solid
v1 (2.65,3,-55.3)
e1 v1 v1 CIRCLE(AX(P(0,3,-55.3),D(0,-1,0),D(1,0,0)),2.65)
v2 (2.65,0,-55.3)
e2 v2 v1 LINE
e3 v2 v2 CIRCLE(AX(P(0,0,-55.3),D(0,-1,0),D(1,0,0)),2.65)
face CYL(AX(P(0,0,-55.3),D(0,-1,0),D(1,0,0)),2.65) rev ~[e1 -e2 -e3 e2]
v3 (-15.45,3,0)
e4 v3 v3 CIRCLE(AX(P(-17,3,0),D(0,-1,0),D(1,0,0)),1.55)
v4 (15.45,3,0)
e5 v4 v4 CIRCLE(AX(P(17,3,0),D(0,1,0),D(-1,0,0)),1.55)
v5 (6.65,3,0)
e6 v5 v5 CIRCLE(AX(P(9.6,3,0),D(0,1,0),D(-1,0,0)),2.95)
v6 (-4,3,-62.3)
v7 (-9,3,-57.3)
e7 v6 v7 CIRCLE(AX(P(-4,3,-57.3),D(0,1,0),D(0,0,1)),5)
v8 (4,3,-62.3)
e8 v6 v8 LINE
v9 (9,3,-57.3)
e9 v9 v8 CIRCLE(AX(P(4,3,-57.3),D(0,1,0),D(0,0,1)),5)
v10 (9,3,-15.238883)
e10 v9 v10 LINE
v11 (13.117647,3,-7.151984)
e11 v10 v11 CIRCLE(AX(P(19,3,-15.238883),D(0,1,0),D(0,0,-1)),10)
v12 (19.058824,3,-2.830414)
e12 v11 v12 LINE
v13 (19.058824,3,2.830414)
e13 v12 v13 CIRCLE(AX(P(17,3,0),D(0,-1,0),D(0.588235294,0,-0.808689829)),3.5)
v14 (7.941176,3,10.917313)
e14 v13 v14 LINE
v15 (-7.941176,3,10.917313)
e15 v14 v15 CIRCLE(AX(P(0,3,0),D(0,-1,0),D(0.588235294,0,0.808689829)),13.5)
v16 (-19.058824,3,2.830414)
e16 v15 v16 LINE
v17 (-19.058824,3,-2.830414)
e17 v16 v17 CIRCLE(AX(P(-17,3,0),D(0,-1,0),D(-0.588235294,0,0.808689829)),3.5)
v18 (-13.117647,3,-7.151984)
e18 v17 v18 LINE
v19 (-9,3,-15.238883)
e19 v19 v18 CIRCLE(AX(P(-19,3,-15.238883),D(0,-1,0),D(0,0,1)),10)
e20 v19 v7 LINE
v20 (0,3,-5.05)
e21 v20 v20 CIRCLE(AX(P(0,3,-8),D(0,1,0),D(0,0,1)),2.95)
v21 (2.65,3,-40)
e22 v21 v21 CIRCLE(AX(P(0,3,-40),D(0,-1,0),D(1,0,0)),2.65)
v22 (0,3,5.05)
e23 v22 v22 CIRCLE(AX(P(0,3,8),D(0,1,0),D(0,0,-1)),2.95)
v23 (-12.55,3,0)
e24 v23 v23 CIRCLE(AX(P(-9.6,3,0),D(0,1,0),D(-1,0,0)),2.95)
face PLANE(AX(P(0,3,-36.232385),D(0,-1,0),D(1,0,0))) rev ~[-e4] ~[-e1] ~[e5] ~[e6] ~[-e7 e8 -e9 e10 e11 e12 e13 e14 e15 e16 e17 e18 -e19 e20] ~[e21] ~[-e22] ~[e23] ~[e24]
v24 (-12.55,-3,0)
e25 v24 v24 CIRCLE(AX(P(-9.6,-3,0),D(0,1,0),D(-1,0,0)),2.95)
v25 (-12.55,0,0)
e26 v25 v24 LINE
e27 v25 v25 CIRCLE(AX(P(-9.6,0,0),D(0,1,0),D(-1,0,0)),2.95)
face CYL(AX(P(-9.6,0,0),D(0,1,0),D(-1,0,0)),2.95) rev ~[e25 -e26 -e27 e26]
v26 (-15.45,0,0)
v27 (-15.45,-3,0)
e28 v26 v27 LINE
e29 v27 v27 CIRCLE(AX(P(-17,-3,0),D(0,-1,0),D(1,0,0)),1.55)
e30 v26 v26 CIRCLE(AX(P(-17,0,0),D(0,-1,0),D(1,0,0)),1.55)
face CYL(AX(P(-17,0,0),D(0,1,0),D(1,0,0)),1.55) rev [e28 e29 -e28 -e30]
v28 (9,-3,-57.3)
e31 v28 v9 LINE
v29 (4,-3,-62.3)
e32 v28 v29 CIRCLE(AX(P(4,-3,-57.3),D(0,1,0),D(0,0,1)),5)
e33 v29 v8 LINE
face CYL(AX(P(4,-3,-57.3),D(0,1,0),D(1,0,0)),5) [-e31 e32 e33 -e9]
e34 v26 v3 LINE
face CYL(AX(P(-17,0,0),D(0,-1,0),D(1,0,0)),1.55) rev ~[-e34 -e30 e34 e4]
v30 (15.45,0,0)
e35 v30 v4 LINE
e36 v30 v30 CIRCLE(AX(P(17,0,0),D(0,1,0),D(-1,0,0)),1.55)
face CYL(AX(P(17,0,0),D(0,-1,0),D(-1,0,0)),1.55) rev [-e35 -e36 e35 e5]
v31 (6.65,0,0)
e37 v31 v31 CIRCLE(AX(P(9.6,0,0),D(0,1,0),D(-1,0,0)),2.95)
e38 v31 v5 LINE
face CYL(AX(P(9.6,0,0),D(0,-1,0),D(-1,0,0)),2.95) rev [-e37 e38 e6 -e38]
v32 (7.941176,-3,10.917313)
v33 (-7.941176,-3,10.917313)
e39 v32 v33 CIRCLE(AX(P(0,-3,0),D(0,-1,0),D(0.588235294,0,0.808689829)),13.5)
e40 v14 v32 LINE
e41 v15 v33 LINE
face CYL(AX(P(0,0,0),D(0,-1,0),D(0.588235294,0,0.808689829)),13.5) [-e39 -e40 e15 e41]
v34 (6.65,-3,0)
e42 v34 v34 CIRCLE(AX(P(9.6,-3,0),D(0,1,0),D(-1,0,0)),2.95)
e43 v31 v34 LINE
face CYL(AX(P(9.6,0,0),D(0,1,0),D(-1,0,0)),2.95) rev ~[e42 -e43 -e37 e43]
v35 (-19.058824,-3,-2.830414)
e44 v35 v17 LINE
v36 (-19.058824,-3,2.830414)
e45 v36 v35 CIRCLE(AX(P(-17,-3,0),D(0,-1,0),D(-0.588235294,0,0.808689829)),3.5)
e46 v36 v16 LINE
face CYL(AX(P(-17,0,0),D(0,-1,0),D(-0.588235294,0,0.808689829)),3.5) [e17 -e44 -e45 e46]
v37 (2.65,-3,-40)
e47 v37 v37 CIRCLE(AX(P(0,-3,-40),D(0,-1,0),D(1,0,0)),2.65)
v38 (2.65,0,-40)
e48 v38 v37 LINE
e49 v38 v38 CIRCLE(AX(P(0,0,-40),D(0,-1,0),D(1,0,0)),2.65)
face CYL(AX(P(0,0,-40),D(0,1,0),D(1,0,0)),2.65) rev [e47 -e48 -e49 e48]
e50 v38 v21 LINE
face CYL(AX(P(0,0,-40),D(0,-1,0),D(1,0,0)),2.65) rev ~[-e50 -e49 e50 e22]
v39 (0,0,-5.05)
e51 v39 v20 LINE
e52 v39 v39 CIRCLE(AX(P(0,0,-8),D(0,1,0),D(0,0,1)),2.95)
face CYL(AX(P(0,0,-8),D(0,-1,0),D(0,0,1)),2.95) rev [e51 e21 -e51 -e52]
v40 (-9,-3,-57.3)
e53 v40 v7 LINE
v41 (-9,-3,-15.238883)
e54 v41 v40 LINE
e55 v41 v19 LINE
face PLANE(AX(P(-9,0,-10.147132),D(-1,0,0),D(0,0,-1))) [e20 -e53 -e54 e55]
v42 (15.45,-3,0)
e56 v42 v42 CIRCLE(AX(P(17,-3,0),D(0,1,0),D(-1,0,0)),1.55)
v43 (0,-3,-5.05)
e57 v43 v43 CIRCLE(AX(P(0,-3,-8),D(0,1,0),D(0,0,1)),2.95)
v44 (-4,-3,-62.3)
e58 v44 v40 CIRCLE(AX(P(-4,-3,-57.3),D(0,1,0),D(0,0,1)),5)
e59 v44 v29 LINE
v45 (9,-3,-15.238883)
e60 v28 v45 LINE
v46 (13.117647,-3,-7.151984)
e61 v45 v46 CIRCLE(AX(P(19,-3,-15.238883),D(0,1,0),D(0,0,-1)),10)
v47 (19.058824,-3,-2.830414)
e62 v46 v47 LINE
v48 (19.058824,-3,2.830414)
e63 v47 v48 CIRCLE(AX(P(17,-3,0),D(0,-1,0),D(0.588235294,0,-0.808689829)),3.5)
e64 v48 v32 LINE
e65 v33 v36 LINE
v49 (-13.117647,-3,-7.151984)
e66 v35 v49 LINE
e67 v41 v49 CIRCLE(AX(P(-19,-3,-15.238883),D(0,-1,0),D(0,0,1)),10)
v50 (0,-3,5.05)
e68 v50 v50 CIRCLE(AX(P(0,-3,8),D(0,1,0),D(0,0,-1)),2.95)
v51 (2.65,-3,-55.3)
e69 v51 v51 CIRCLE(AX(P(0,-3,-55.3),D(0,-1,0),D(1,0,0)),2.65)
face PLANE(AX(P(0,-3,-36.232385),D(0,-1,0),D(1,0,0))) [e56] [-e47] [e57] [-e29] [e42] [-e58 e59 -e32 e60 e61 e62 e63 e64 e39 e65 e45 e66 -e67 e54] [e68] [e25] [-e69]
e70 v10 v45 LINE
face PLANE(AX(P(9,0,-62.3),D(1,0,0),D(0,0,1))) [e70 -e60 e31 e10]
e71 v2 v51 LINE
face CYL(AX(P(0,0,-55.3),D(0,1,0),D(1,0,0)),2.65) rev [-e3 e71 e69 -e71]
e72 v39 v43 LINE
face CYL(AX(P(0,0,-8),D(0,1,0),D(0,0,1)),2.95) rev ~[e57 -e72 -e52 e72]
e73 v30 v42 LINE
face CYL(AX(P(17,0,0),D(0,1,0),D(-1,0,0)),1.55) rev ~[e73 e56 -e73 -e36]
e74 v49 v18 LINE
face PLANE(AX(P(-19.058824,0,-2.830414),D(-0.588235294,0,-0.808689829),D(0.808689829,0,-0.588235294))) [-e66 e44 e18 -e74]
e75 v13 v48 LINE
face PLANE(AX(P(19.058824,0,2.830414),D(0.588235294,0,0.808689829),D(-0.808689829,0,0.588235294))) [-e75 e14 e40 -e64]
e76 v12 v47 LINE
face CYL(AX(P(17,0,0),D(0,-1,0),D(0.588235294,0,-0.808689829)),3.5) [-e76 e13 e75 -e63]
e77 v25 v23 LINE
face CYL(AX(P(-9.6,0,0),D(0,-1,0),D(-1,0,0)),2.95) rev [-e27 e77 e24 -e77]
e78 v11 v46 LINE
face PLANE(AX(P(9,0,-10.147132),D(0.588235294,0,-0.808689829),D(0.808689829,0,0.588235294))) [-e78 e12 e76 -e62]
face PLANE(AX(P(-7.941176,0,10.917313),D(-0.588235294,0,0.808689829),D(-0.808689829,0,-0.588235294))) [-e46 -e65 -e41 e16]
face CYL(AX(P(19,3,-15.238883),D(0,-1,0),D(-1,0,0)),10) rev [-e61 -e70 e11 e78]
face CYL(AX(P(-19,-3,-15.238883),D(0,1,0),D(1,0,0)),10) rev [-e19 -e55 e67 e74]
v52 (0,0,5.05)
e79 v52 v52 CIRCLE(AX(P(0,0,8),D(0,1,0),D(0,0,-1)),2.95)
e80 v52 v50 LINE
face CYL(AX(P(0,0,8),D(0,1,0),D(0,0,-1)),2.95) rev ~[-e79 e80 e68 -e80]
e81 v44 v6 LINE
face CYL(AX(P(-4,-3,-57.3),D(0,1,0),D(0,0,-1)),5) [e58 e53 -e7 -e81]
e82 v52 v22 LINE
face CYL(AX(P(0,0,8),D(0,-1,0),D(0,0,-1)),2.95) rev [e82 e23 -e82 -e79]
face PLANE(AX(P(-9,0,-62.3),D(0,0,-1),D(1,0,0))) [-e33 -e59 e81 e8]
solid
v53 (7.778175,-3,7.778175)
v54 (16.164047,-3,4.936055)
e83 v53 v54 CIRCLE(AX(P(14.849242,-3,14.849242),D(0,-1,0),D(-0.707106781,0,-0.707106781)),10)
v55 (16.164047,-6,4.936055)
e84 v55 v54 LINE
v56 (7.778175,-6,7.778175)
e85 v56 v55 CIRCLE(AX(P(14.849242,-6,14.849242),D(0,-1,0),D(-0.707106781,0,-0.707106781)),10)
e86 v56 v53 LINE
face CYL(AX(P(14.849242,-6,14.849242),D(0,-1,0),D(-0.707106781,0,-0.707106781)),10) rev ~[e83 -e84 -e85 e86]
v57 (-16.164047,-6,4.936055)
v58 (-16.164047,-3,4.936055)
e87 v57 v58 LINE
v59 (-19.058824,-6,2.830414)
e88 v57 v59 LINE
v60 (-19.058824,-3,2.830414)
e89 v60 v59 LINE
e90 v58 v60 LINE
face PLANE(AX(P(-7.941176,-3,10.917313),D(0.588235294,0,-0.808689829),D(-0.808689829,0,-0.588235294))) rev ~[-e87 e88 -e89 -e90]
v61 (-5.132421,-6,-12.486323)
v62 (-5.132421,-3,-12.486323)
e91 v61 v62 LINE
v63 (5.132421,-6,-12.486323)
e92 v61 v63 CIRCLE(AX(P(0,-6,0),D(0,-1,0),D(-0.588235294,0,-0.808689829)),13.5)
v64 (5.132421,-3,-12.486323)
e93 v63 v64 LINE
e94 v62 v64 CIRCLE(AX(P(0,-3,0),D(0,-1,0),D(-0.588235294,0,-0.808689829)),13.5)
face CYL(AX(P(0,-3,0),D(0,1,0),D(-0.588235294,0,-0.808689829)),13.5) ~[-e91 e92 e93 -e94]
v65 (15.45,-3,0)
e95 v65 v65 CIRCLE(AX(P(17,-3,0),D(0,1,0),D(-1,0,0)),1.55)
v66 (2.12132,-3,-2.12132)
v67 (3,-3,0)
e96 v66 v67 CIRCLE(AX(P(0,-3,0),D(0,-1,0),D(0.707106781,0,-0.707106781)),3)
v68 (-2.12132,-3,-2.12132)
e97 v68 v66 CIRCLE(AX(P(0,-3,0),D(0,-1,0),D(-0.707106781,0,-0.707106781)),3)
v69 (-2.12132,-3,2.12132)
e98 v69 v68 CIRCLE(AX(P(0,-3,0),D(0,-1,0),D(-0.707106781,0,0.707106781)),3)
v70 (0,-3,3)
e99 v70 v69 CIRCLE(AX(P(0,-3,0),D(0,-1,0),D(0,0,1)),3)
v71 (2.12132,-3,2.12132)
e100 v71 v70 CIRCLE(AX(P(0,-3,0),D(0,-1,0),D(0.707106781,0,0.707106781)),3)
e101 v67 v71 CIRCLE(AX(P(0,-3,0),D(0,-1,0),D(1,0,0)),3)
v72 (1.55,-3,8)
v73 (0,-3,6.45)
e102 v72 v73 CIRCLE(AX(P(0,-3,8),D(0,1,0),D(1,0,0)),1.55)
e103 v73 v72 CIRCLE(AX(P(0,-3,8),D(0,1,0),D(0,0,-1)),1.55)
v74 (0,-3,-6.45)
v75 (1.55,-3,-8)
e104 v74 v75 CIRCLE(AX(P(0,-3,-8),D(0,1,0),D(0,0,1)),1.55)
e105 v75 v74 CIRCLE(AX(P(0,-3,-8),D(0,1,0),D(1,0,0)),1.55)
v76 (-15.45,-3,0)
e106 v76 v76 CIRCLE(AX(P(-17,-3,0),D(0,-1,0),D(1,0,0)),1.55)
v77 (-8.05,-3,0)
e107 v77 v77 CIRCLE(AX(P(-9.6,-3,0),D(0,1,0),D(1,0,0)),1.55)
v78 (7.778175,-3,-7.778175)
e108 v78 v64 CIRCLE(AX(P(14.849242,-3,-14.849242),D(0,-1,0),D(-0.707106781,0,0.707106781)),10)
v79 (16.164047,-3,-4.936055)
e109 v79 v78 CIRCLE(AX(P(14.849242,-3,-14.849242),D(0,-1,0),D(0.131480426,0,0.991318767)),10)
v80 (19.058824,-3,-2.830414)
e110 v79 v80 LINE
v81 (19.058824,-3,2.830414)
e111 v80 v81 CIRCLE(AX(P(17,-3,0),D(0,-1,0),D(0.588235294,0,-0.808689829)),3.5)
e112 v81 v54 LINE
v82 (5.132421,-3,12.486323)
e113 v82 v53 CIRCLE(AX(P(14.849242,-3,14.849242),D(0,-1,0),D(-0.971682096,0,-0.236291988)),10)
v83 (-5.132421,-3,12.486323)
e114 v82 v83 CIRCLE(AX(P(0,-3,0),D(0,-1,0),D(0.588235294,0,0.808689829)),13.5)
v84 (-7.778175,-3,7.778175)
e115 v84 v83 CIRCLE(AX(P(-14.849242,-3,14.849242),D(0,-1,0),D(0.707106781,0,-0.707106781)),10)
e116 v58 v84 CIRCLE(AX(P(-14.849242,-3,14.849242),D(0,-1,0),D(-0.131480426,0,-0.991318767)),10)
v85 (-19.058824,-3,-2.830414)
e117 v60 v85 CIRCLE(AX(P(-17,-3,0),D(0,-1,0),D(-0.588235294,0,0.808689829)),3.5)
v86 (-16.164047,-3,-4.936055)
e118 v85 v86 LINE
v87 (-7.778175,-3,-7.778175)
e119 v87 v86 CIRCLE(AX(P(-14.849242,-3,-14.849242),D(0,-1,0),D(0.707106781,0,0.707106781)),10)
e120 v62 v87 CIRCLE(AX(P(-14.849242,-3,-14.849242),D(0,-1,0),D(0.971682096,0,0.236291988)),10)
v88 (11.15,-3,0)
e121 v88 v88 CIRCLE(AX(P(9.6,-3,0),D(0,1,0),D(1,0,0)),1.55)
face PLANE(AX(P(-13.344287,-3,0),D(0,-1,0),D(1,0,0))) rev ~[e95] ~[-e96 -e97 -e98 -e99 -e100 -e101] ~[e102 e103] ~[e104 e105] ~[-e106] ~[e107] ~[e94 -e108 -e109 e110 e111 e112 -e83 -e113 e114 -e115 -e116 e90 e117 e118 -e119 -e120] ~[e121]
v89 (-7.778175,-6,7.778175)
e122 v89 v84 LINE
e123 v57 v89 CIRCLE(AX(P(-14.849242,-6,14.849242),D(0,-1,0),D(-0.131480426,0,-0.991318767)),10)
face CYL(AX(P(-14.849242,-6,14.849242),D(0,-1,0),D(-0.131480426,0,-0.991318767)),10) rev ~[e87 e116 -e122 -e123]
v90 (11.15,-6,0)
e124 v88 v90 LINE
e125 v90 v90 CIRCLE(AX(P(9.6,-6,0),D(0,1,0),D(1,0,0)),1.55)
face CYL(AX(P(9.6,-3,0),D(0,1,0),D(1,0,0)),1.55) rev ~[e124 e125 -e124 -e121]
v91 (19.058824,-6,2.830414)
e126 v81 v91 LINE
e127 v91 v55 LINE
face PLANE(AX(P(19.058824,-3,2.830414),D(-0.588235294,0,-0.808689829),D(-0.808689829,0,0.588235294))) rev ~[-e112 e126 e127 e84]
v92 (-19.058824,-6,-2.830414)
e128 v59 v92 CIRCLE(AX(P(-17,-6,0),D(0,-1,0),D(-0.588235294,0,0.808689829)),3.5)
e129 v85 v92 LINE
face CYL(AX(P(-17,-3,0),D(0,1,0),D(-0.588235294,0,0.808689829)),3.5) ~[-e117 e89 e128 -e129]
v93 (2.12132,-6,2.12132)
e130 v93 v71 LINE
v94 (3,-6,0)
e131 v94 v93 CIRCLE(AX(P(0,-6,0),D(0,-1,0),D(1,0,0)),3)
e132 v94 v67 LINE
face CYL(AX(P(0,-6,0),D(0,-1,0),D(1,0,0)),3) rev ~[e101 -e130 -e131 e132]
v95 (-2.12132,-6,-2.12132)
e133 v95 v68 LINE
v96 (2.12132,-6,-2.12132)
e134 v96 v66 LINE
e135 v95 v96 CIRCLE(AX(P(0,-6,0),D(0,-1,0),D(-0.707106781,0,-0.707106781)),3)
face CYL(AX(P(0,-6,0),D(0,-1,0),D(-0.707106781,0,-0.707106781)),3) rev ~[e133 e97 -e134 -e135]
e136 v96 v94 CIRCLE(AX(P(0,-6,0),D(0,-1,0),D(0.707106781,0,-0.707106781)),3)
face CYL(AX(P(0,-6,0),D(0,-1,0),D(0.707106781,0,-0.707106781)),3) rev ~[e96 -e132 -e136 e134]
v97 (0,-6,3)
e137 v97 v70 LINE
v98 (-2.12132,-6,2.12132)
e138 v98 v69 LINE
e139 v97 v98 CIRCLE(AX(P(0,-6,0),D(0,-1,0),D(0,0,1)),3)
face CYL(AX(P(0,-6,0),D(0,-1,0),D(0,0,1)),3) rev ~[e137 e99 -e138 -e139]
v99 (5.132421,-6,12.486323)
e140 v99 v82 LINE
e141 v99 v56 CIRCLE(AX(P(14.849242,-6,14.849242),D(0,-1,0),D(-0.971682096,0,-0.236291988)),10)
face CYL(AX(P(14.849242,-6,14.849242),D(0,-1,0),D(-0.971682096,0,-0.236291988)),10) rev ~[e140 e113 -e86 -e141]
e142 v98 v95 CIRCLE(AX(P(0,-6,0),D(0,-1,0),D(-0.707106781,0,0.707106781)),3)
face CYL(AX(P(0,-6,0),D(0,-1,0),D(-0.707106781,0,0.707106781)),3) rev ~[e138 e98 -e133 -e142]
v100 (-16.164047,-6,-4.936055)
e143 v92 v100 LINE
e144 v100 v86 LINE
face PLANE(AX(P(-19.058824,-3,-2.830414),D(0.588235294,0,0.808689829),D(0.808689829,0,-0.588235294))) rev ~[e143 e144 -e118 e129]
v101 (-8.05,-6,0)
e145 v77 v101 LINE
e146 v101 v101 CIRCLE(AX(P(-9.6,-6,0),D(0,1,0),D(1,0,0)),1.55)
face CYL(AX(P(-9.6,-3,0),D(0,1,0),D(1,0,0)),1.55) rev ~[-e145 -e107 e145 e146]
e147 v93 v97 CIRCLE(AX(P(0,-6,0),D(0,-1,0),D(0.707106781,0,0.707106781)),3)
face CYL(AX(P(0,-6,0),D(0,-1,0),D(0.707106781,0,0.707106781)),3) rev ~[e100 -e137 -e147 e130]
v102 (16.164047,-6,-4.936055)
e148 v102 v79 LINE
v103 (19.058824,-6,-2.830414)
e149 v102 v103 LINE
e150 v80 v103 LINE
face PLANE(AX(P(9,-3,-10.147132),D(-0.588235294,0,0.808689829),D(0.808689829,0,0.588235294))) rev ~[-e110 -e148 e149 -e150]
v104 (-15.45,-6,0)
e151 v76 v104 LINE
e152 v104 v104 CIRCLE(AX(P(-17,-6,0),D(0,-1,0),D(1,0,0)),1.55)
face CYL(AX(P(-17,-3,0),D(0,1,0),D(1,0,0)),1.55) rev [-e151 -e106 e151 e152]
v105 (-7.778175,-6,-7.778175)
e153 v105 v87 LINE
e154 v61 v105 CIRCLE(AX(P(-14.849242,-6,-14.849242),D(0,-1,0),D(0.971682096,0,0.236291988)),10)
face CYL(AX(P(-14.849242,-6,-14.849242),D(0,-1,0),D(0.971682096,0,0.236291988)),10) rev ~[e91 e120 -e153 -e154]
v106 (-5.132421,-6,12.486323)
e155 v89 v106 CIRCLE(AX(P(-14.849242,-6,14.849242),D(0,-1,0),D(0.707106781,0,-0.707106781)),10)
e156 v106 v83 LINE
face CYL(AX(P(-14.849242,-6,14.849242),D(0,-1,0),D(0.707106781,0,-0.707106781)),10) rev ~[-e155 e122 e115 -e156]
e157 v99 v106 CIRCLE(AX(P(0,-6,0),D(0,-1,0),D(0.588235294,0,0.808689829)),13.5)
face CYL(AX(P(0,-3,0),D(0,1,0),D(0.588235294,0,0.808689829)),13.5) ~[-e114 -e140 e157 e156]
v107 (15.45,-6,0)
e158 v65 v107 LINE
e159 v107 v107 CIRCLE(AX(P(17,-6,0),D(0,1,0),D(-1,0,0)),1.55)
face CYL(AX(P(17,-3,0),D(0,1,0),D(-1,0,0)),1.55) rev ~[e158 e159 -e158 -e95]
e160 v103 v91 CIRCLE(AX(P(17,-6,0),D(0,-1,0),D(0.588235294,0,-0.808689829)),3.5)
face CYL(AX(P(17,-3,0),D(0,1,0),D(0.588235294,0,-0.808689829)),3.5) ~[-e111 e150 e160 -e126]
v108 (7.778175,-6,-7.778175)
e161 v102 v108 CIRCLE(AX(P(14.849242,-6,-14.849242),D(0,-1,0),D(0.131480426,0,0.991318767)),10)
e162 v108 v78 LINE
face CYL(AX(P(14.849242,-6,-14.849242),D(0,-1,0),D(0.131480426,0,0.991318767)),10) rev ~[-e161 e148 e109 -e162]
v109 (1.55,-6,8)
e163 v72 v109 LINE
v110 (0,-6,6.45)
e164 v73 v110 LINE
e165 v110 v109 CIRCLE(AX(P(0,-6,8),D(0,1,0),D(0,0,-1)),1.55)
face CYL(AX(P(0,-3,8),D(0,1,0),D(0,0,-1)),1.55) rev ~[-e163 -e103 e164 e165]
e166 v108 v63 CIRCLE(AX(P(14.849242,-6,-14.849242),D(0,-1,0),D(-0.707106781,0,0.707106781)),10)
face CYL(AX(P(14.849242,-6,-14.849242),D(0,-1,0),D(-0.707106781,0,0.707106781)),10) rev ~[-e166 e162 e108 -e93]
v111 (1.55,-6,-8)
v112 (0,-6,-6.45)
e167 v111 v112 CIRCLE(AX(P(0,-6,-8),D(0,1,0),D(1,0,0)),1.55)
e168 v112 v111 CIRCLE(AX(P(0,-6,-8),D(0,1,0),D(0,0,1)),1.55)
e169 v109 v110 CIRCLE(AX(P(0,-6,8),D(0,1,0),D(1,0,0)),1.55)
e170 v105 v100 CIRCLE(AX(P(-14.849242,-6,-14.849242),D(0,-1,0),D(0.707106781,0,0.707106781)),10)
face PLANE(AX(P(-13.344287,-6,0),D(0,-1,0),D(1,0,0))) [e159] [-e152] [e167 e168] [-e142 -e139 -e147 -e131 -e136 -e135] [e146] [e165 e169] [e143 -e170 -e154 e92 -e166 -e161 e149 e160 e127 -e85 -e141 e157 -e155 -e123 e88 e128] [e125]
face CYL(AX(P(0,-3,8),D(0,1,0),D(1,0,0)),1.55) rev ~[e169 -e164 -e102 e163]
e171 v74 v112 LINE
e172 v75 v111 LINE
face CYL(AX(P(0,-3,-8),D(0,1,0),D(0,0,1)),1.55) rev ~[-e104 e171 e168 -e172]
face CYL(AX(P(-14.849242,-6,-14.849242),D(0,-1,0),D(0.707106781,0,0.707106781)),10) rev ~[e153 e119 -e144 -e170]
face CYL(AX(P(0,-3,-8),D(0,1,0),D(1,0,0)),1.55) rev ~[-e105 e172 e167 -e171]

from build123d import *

# Parameters (mm, degrees)
F0_R     = 2.65
F0_R_2   = 1.55
F1_DEPTH = 3
F2_START = 3
F2_DEPTH = 3
F3_R     = 10
F4_R     = 5
F6_DEPTH = 25


with BuildPart() as f1:
    # F0 (on Front) → F1 (new body, symmetric)
    with BuildSketch(Plane.XZ):
        with BuildLine():
            Line((9, -10.147131896), (7.9411764706, -10.917312685))
            ThreePointArc((7.9411764706, -10.917312685), (0, -13.5), (-7.9411764706, -10.917312685))
            Line((-7.9411764706, -10.917312685), (-9, -10.147131896))
            Line((-9, -10.147131896), (-9, -62.3))
            Line((-9, -62.3), (9, -62.3))
            Line((9, -62.3), (9, -10.147131896))
        make_face()
        with Locations((0, -55.3)):
            Circle(F0_R, mode=Mode.SUBTRACT)
        with Locations((0, -40)):
            Circle(F0_R, mode=Mode.SUBTRACT)
        with BuildLine():
            ThreePointArc((7.9411764706, 10.917312685), (12.0302926472, 6.1255251876), (13.5, 0))
            ThreePointArc((13.5, 0), (12.0302926472, -6.1255251876), (7.9411764706, -10.917312685))
            Line((7.9411764706, -10.917312685), (9, -10.147131896))
            Line((9, -10.147131896), (19.0588235294, -2.8304143998))
            ThreePointArc((19.0588235294, -2.8304143998), (20.5, 0), (19.0588235294, 2.8304143998))
            Line((19.0588235294, 2.8304143998), (7.9411764706, 10.917312685))
        make_face()
        with BuildLine():
            ThreePointArc((18.55, 0), (17, -1.55), (15.45, 0))
            ThreePointArc((15.45, 0), (17, 1.55), (18.55, 0))
        make_face(mode=Mode.SUBTRACT)
        with BuildLine():
            ThreePointArc((7.9411764706, -10.917312685), (12.0302926472, -6.1255251876), (13.5, 0))
            Line((13.5, 0), (12.55, 0))
            ThreePointArc((12.55, 0), (9.6, -2.95), (6.65, 0))
            Line((6.65, 0), (0, 0))
            Line((0, 0), (-6.65, 0))
            ThreePointArc((-6.65, 0), (-9.6, -2.95), (-12.55, 0))
            Line((-12.55, 0), (-13.5, 0))
            ThreePointArc((-13.5, 0), (-12.0302926472, -6.1255251876), (-7.9411764706, -10.917312685))
            ThreePointArc((-7.9411764706, -10.917312685), (0, -13.5), (7.9411764706, -10.917312685))
        make_face()
        with BuildLine():
            ThreePointArc((2.95, -8), (-2.0859650045, -10.0859650045), (0, -5.05))
            ThreePointArc((0, -5.05), (2.0859650045, -5.9140349955), (2.95, -8))
        make_face(mode=Mode.SUBTRACT)
        with BuildLine():
            Line((12.55, 0), (13.5, 0))
            ThreePointArc((13.5, 0), (12.0302926472, 6.1255251876), (7.9411764706, 10.917312685))
            ThreePointArc((7.9411764706, 10.917312685), (0, 13.5), (-7.9411764706, 10.917312685))
            ThreePointArc((-7.9411764706, 10.917312685), (-12.0302926472, 6.1255251876), (-13.5, 0))
            Line((-13.5, 0), (-12.55, 0))
            ThreePointArc((-12.55, 0), (-9.6, 2.95), (-6.65, 0))
            Line((-6.65, 0), (0, 0))
            Line((0, 0), (6.65, 0))
            ThreePointArc((6.65, 0), (9.6, 2.95), (12.55, 0))
        make_face()
        with BuildLine():
            ThreePointArc((2.95, 8), (2.0859650045, 5.9140349955), (0, 5.05))
            ThreePointArc((0, 5.05), (-2.0859650045, 10.0859650045), (2.95, 8))
        make_face(mode=Mode.SUBTRACT)
        with BuildLine():
            ThreePointArc((-13.5, 0), (-12.0302926472, 6.1255251876), (-7.9411764706, 10.917312685))
            Line((-7.9411764706, 10.917312685), (-19.0588235294, 2.8304143998))
            ThreePointArc((-19.0588235294, 2.8304143998), (-20.5, 0), (-19.0588235294, -2.8304143998))
            Line((-19.0588235294, -2.8304143998), (-9, -10.147131896))
            Line((-9, -10.147131896), (-7.9411764706, -10.917312685))
            ThreePointArc((-7.9411764706, -10.917312685), (-12.0302926472, -6.1255251876), (-13.5, 0))
        make_face()
        with Locations((-17, 0)):
            Circle(F0_R_2, mode=Mode.SUBTRACT)
    extrude(amount=F1_DEPTH, both=True)

    # F3
    f3_edges = [f1.edges().sort_by_distance(p)[0] for p in [
        (9, 0, -10.147132),
        (-9, 0, -10.147132),
    ]]
    fillet(f3_edges, radius=F3_R)

    # F4
    f4_edges = [f1.edges().sort_by_distance(p)[0] for p in [
        (9, 0, -62.3),
        (-9, 0, -62.3),
    ]]
    fillet(f4_edges, radius=F4_R)


with BuildPart() as f2:
    # F0 (on Front) → F2 (new body)
    with BuildSketch(Plane.XZ.offset(F2_START)):
        with BuildLine():
            ThreePointArc((-13.5, 0), (-12.0302926472, 6.1255251876), (-7.9411764706, 10.917312685))
            Line((-7.9411764706, 10.917312685), (-19.0588235294, 2.8304143998))
            ThreePointArc((-19.0588235294, 2.8304143998), (-20.5, 0), (-19.0588235294, -2.8304143998))
            Line((-19.0588235294, -2.8304143998), (-9, -10.147131896))
            Line((-9, -10.147131896), (-7.9411764706, -10.917312685))
            ThreePointArc((-7.9411764706, -10.917312685), (-12.0302926472, -6.1255251876), (-13.5, 0))
        make_face()
        with Locations((-17, 0)):
            Circle(F0_R_2, mode=Mode.SUBTRACT)
        with BuildLine():
            Line((12.55, 0), (13.5, 0))
            ThreePointArc((13.5, 0), (12.0302926472, 6.1255251876), (7.9411764706, 10.917312685))
            ThreePointArc((7.9411764706, 10.917312685), (0, 13.5), (-7.9411764706, 10.917312685))
            ThreePointArc((-7.9411764706, 10.917312685), (-12.0302926472, 6.1255251876), (-13.5, 0))
            Line((-13.5, 0), (-12.55, 0))
            ThreePointArc((-12.55, 0), (-9.6, 2.95), (-6.65, 0))
            Line((-6.65, 0), (0, 0))
            Line((0, 0), (6.65, 0))
            ThreePointArc((6.65, 0), (9.6, 2.95), (12.55, 0))
        make_face()
        with BuildLine():
            ThreePointArc((2.95, 8), (2.0859650045, 5.9140349955), (0, 5.05))
            ThreePointArc((0, 5.05), (-2.0859650045, 10.0859650045), (2.95, 8))
        make_face(mode=Mode.SUBTRACT)
        with BuildLine():
            ThreePointArc((7.9411764706, -10.917312685), (12.0302926472, -6.1255251876), (13.5, 0))
            Line((13.5, 0), (12.55, 0))
            ThreePointArc((12.55, 0), (9.6, -2.95), (6.65, 0))
            Line((6.65, 0), (0, 0))
            Line((0, 0), (-6.65, 0))
            ThreePointArc((-6.65, 0), (-9.6, -2.95), (-12.55, 0))
            Line((-12.55, 0), (-13.5, 0))
            ThreePointArc((-13.5, 0), (-12.0302926472, -6.1255251876), (-7.9411764706, -10.917312685))
            ThreePointArc((-7.9411764706, -10.917312685), (0, -13.5), (7.9411764706, -10.917312685))
        make_face()
        with BuildLine():
            ThreePointArc((2.95, -8), (-2.0859650045, -10.0859650045), (0, -5.05))
            ThreePointArc((0, -5.05), (2.0859650045, -5.9140349955), (2.95, -8))
        make_face(mode=Mode.SUBTRACT)
        with BuildLine():
            ThreePointArc((-6.65, 0), (-9.6, 2.95), (-12.55, 0))
            Line((-12.55, 0), (-11.15, 0))
            ThreePointArc((-11.15, 0), (-9.6, 1.55), (-8.05, 0))
            Line((-8.05, 0), (-6.65, 0))
        make_face()
        with BuildLine():
            ThreePointArc((2.95, 8), (-2.0859650045, 10.0859650045), (0, 5.05))
            ThreePointArc((0, 5.05), (2.0859650045, 5.9140349955), (2.95, 8))
        make_face()
        with BuildLine():
            ThreePointArc((1.55, 8), (1.0960155108, 6.9039844892), (0, 6.45))
            ThreePointArc((0, 6.45), (-1.0960155108, 9.0960155108), (1.55, 8))
        make_face(mode=Mode.SUBTRACT)
        with BuildLine():
            Line((11.15, 0), (12.55, 0))
            ThreePointArc((12.55, 0), (9.6, 2.95), (6.65, 0))
            Line((6.65, 0), (8.05, 0))
            ThreePointArc((8.05, 0), (9.6, 1.55), (11.15, 0))
        make_face()
        with BuildLine():
            ThreePointArc((6.65, 0), (9.6, -2.95), (12.55, 0))
            Line((12.55, 0), (11.15, 0))
            ThreePointArc((11.15, 0), (9.6, -1.55), (8.05, 0))
            Line((8.05, 0), (6.65, 0))
        make_face()
        with BuildLine():
            Line((-11.15, 0), (-12.55, 0))
            ThreePointArc((-12.55, 0), (-9.6, -2.95), (-6.65, 0))
            Line((-6.65, 0), (-8.05, 0))
            ThreePointArc((-8.05, 0), (-9.6, -1.55), (-11.15, 0))
        make_face()
        with BuildLine():
            ThreePointArc((2.95, -8), (2.0859650045, -5.9140349955), (0, -5.05))
            ThreePointArc((0, -5.05), (-2.0859650045, -10.0859650045), (2.95, -8))
        make_face()
        with BuildLine():
            ThreePointArc((1.55, -8), (-1.0960155108, -9.0960155108), (0, -6.45))
            ThreePointArc((0, -6.45), (1.0960155108, -6.9039844892), (1.55, -8))
        make_face(mode=Mode.SUBTRACT)
        with BuildLine():
            ThreePointArc((7.9411764706, 10.917312685), (12.0302926472, 6.1255251876), (13.5, 0))
            ThreePointArc((13.5, 0), (12.0302926472, -6.1255251876), (7.9411764706, -10.917312685))
            Line((7.9411764706, -10.917312685), (9, -10.147131896))
            Line((9, -10.147131896), (19.0588235294, -2.8304143998))
            ThreePointArc((19.0588235294, -2.8304143998), (20.5, 0), (19.0588235294, 2.8304143998))
            Line((19.0588235294, 2.8304143998), (7.9411764706, 10.917312685))
        make_face()
        with BuildLine():
            ThreePointArc((18.55, 0), (17, -1.55), (15.45, 0))
            ThreePointArc((15.45, 0), (17, 1.55), (18.55, 0))
        make_face(mode=Mode.SUBTRACT)
    extrude(amount=F2_DEPTH)

    # F5 (on face) → F6 (cut)
    with BuildSketch(Plane.XZ.offset(6)):
        with BuildLine():
            ThreePointArc((-7.9411764706, 10.917312685), (-6.5837062936, 11.785788537), (-5.1324214417, 12.4863225228))
            ThreePointArc((-5.1324214417, 12.4863225228), (-5.2207257313, 17.5495510293), (-7.7781745931, 21.9203102168))
            Line((-7.7781745931, 21.9203102168), (-14.8492424049, 14.8492424049))
            Line((-14.8492424049, 14.8492424049), (-9.6640827638, 9.6640827638))
            Line((-9.6640827638, 9.6640827638), (-7.9411764706, 10.917312685))
        make_face()
        with BuildLine():
            ThreePointArc((-21.9203102168, 7.7781745931), (-19.2764451233, 5.8826446058), (-16.1640466618, 4.9360547357))
            Line((-16.1640466618, 4.9360547357), (-9.6640827638, 9.6640827638))
            Line((-9.6640827638, 9.6640827638), (-14.8492424049, 14.8492424049))
            Line((-14.8492424049, 14.8492424049), (-21.9203102168, 7.7781745931))
        make_face()
        with BuildLine():
            ThreePointArc((-16.1640466618, 4.9360547357), (-11.6394053608, 5.3783952332), (-7.7781745931, 7.7781745931))
            Line((-7.7781745931, 7.7781745931), (-9.6640827638, 9.6640827638))
            Line((-9.6640827638, 9.6640827638), (-16.1640466618, 4.9360547357))
        make_face()
        with BuildLine():
            Line((-9.6640827638, 9.6640827638), (-7.7781745931, 7.7781745931))
            ThreePointArc((-7.7781745931, 7.7781745931), (-6.1314464327, 9.9502595118), (-5.1324214417, 12.4863225228))
            ThreePointArc((-5.1324214417, 12.4863225228), (-6.5837062936, 11.785788537), (-7.9411764706, 10.917312685))
            Line((-7.9411764706, 10.917312685), (-9.6640827638, 9.6640827638))
        make_face()
        with BuildLine():
            ThreePointArc((5.1324214417, 12.4863225228), (6.1314464327, 9.9502595118), (7.7781745931, 7.7781745931))
            Line((7.7781745931, 7.7781745931), (9.6640827638, 9.6640827638))
            Line((9.6640827638, 9.6640827638), (7.9411764706, 10.917312685))
            ThreePointArc((7.9411764706, 10.917312685), (6.5837062936, 11.785788537), (5.1324214417, 12.4863225228))
        make_face()
        with BuildLine():
            Line((9.6640827638, 9.6640827638), (16.1640466618, 4.9360547357))
            ThreePointArc((16.1640466618, 4.9360547357), (19.2764451233, 5.8826446058), (21.9203102168, 7.7781745931))
            Line((21.9203102168, 7.7781745931), (14.8492424049, 14.8492424049))
            Line((14.8492424049, 14.8492424049), (9.6640827638, 9.6640827638))
        make_face()
        with BuildLine():
            Line((9.6640827638, 9.6640827638), (7.7781745931, 7.7781745931))
            ThreePointArc((7.7781745931, 7.7781745931), (11.6394053608, 5.3783952332), (16.1640466618, 4.9360547357))
            Line((16.1640466618, 4.9360547357), (9.6640827638, 9.6640827638))
        make_face()
        with BuildLine():
            ThreePointArc((16.1640466618, -4.9360547357), (11.6394053608, -5.3783952332), (7.7781745931, -7.7781745931))
            Line((7.7781745931, -7.7781745931), (9.6640827638, -9.6640827638))
            Line((9.6640827638, -9.6640827638), (16.1640466618, -4.9360547357))
        make_face()
        with BuildLine():
            ThreePointArc((21.9203102168, -7.7781745931), (19.2764451233, -5.8826446058), (16.1640466618, -4.9360547357))
            Line((16.1640466618, -4.9360547357), (9.6640827638, -9.6640827638))
            Line((9.6640827638, -9.6640827638), (14.8492424049, -14.8492424049))
            Line((14.8492424049, -14.8492424049), (21.9203102168, -7.7781745931))
        make_face()
        with BuildLine():
            ThreePointArc((7.9411764706, -10.917312685), (6.5837062936, -11.785788537), (5.1324214417, -12.4863225228))
            ThreePointArc((5.1324214417, -12.4863225228), (5.2207257313, -17.5495510293), (7.7781745931, -21.9203102168))
            Line((7.7781745931, -21.9203102168), (14.8492424049, -14.8492424049))
            Line((14.8492424049, -14.8492424049), (9.6640827638, -9.6640827638))
            Line((9.6640827638, -9.6640827638), (7.9411764706, -10.917312685))
        make_face()
        with BuildLine():
            Line((9.6640827638, -9.6640827638), (7.7781745931, -7.7781745931))
            ThreePointArc((7.7781745931, -7.7781745931), (6.1314464327, -9.9502595118), (5.1324214417, -12.4863225228))
            ThreePointArc((5.1324214417, -12.4863225228), (6.5837062936, -11.785788537), (7.9411764706, -10.917312685))
            Line((7.9411764706, -10.917312685), (9.6640827638, -9.6640827638))
        make_face()
        with BuildLine():
            ThreePointArc((-7.7781745931, -21.9203102168), (-5.2207257313, -17.5495510293), (-5.1324214417, -12.4863225228))
            ThreePointArc((-5.1324214417, -12.4863225228), (-6.5837062936, -11.785788537), (-7.9411764706, -10.917312685))
            Line((-7.9411764706, -10.917312685), (-9.6640827638, -9.6640827638))
            Line((-9.6640827638, -9.6640827638), (-14.8492424049, -14.8492424049))
            Line((-14.8492424049, -14.8492424049), (-7.7781745931, -21.9203102168))
        make_face()
        with BuildLine():
            ThreePointArc((-5.1324214417, -12.4863225228), (-6.1314464327, -9.9502595118), (-7.7781745931, -7.7781745931))
            Line((-7.7781745931, -7.7781745931), (-9.6640827638, -9.6640827638))
            Line((-9.6640827638, -9.6640827638), (-7.9411764706, -10.917312685))
            ThreePointArc((-7.9411764706, -10.917312685), (-6.5837062936, -11.785788537), (-5.1324214417, -12.4863225228))
        make_face()
        with BuildLine():
            Line((-9.6640827638, -9.6640827638), (-7.7781745931, -7.7781745931))
            ThreePointArc((-7.7781745931, -7.7781745931), (-11.6394053608, -5.3783952332), (-16.1640466618, -4.9360547357))
            Line((-16.1640466618, -4.9360547357), (-9.6640827638, -9.6640827638))
        make_face()
        with BuildLine():
            Line((-9.6640827638, -9.6640827638), (-16.1640466618, -4.9360547357))
            ThreePointArc((-16.1640466618, -4.9360547357), (-19.2764451233, -5.8826446058), (-21.9203102168, -7.7781745931))
            Line((-21.9203102168, -7.7781745931), (-14.8492424049, -14.8492424049))
            Line((-14.8492424049, -14.8492424049), (-9.6640827638, -9.6640827638))
        make_face()
        with BuildLine():
            ThreePointArc((7.7781745931, 21.9203102168), (5.2207257313, 17.5495510293), (5.1324214417, 12.4863225228))
            ThreePointArc((5.1324214417, 12.4863225228), (6.5837062936, 11.785788537), (7.9411764706, 10.917312685))
            Line((7.9411764706, 10.917312685), (9.6640827638, 9.6640827638))
            Line((9.6640827638, 9.6640827638), (14.8492424049, 14.8492424049))
            Line((14.8492424049, 14.8492424049), (7.7781745931, 21.9203102168))
        make_face()
        with BuildLine():
            ThreePointArc((2.1213203436, -2.1213203436), (2.7716385975, -1.1480502971), (3, 0))
            ThreePointArc((3, 0), (2.7716385975, 1.1480502971), (2.1213203436, 2.1213203436))
            Line((2.1213203436, 2.1213203436), (0, 0))
            Line((0, 0), (2.1213203436, -2.1213203436))
        make_face()
        with BuildLine():
            Line((0, 0), (2.1213203436, 2.1213203436))
            ThreePointArc((2.1213203436, 2.1213203436), (1.1480502971, 2.7716385975), (0, 3))
            Line((0, 3), (0, 0))
        make_face()
        with BuildLine():
            Line((0, 0), (0, 3))
            ThreePointArc((0, 3), (-1.1480502971, 2.7716385975), (-2.1213203436, 2.1213203436))
            Line((-2.1213203436, 2.1213203436), (0, 0))
        make_face()
        with BuildLine():
            Line((-2.1213203436, -2.1213203436), (0, 0))
            Line((0, 0), (-2.1213203436, 2.1213203436))
            ThreePointArc((-2.1213203436, 2.1213203436), (-3, 0), (-2.1213203436, -2.1213203436))
        make_face()
        with BuildLine():
            ThreePointArc((-2.1213203436, -2.1213203436), (0, -3), (2.1213203436, -2.1213203436))
            Line((2.1213203436, -2.1213203436), (0, 0))
            Line((0, 0), (-2.1213203436, -2.1213203436))
        make_face()
    extrude(amount=-F6_DEPTH, mode=Mode.SUBTRACT)


solid = Compound([f1.part, f2.part])
